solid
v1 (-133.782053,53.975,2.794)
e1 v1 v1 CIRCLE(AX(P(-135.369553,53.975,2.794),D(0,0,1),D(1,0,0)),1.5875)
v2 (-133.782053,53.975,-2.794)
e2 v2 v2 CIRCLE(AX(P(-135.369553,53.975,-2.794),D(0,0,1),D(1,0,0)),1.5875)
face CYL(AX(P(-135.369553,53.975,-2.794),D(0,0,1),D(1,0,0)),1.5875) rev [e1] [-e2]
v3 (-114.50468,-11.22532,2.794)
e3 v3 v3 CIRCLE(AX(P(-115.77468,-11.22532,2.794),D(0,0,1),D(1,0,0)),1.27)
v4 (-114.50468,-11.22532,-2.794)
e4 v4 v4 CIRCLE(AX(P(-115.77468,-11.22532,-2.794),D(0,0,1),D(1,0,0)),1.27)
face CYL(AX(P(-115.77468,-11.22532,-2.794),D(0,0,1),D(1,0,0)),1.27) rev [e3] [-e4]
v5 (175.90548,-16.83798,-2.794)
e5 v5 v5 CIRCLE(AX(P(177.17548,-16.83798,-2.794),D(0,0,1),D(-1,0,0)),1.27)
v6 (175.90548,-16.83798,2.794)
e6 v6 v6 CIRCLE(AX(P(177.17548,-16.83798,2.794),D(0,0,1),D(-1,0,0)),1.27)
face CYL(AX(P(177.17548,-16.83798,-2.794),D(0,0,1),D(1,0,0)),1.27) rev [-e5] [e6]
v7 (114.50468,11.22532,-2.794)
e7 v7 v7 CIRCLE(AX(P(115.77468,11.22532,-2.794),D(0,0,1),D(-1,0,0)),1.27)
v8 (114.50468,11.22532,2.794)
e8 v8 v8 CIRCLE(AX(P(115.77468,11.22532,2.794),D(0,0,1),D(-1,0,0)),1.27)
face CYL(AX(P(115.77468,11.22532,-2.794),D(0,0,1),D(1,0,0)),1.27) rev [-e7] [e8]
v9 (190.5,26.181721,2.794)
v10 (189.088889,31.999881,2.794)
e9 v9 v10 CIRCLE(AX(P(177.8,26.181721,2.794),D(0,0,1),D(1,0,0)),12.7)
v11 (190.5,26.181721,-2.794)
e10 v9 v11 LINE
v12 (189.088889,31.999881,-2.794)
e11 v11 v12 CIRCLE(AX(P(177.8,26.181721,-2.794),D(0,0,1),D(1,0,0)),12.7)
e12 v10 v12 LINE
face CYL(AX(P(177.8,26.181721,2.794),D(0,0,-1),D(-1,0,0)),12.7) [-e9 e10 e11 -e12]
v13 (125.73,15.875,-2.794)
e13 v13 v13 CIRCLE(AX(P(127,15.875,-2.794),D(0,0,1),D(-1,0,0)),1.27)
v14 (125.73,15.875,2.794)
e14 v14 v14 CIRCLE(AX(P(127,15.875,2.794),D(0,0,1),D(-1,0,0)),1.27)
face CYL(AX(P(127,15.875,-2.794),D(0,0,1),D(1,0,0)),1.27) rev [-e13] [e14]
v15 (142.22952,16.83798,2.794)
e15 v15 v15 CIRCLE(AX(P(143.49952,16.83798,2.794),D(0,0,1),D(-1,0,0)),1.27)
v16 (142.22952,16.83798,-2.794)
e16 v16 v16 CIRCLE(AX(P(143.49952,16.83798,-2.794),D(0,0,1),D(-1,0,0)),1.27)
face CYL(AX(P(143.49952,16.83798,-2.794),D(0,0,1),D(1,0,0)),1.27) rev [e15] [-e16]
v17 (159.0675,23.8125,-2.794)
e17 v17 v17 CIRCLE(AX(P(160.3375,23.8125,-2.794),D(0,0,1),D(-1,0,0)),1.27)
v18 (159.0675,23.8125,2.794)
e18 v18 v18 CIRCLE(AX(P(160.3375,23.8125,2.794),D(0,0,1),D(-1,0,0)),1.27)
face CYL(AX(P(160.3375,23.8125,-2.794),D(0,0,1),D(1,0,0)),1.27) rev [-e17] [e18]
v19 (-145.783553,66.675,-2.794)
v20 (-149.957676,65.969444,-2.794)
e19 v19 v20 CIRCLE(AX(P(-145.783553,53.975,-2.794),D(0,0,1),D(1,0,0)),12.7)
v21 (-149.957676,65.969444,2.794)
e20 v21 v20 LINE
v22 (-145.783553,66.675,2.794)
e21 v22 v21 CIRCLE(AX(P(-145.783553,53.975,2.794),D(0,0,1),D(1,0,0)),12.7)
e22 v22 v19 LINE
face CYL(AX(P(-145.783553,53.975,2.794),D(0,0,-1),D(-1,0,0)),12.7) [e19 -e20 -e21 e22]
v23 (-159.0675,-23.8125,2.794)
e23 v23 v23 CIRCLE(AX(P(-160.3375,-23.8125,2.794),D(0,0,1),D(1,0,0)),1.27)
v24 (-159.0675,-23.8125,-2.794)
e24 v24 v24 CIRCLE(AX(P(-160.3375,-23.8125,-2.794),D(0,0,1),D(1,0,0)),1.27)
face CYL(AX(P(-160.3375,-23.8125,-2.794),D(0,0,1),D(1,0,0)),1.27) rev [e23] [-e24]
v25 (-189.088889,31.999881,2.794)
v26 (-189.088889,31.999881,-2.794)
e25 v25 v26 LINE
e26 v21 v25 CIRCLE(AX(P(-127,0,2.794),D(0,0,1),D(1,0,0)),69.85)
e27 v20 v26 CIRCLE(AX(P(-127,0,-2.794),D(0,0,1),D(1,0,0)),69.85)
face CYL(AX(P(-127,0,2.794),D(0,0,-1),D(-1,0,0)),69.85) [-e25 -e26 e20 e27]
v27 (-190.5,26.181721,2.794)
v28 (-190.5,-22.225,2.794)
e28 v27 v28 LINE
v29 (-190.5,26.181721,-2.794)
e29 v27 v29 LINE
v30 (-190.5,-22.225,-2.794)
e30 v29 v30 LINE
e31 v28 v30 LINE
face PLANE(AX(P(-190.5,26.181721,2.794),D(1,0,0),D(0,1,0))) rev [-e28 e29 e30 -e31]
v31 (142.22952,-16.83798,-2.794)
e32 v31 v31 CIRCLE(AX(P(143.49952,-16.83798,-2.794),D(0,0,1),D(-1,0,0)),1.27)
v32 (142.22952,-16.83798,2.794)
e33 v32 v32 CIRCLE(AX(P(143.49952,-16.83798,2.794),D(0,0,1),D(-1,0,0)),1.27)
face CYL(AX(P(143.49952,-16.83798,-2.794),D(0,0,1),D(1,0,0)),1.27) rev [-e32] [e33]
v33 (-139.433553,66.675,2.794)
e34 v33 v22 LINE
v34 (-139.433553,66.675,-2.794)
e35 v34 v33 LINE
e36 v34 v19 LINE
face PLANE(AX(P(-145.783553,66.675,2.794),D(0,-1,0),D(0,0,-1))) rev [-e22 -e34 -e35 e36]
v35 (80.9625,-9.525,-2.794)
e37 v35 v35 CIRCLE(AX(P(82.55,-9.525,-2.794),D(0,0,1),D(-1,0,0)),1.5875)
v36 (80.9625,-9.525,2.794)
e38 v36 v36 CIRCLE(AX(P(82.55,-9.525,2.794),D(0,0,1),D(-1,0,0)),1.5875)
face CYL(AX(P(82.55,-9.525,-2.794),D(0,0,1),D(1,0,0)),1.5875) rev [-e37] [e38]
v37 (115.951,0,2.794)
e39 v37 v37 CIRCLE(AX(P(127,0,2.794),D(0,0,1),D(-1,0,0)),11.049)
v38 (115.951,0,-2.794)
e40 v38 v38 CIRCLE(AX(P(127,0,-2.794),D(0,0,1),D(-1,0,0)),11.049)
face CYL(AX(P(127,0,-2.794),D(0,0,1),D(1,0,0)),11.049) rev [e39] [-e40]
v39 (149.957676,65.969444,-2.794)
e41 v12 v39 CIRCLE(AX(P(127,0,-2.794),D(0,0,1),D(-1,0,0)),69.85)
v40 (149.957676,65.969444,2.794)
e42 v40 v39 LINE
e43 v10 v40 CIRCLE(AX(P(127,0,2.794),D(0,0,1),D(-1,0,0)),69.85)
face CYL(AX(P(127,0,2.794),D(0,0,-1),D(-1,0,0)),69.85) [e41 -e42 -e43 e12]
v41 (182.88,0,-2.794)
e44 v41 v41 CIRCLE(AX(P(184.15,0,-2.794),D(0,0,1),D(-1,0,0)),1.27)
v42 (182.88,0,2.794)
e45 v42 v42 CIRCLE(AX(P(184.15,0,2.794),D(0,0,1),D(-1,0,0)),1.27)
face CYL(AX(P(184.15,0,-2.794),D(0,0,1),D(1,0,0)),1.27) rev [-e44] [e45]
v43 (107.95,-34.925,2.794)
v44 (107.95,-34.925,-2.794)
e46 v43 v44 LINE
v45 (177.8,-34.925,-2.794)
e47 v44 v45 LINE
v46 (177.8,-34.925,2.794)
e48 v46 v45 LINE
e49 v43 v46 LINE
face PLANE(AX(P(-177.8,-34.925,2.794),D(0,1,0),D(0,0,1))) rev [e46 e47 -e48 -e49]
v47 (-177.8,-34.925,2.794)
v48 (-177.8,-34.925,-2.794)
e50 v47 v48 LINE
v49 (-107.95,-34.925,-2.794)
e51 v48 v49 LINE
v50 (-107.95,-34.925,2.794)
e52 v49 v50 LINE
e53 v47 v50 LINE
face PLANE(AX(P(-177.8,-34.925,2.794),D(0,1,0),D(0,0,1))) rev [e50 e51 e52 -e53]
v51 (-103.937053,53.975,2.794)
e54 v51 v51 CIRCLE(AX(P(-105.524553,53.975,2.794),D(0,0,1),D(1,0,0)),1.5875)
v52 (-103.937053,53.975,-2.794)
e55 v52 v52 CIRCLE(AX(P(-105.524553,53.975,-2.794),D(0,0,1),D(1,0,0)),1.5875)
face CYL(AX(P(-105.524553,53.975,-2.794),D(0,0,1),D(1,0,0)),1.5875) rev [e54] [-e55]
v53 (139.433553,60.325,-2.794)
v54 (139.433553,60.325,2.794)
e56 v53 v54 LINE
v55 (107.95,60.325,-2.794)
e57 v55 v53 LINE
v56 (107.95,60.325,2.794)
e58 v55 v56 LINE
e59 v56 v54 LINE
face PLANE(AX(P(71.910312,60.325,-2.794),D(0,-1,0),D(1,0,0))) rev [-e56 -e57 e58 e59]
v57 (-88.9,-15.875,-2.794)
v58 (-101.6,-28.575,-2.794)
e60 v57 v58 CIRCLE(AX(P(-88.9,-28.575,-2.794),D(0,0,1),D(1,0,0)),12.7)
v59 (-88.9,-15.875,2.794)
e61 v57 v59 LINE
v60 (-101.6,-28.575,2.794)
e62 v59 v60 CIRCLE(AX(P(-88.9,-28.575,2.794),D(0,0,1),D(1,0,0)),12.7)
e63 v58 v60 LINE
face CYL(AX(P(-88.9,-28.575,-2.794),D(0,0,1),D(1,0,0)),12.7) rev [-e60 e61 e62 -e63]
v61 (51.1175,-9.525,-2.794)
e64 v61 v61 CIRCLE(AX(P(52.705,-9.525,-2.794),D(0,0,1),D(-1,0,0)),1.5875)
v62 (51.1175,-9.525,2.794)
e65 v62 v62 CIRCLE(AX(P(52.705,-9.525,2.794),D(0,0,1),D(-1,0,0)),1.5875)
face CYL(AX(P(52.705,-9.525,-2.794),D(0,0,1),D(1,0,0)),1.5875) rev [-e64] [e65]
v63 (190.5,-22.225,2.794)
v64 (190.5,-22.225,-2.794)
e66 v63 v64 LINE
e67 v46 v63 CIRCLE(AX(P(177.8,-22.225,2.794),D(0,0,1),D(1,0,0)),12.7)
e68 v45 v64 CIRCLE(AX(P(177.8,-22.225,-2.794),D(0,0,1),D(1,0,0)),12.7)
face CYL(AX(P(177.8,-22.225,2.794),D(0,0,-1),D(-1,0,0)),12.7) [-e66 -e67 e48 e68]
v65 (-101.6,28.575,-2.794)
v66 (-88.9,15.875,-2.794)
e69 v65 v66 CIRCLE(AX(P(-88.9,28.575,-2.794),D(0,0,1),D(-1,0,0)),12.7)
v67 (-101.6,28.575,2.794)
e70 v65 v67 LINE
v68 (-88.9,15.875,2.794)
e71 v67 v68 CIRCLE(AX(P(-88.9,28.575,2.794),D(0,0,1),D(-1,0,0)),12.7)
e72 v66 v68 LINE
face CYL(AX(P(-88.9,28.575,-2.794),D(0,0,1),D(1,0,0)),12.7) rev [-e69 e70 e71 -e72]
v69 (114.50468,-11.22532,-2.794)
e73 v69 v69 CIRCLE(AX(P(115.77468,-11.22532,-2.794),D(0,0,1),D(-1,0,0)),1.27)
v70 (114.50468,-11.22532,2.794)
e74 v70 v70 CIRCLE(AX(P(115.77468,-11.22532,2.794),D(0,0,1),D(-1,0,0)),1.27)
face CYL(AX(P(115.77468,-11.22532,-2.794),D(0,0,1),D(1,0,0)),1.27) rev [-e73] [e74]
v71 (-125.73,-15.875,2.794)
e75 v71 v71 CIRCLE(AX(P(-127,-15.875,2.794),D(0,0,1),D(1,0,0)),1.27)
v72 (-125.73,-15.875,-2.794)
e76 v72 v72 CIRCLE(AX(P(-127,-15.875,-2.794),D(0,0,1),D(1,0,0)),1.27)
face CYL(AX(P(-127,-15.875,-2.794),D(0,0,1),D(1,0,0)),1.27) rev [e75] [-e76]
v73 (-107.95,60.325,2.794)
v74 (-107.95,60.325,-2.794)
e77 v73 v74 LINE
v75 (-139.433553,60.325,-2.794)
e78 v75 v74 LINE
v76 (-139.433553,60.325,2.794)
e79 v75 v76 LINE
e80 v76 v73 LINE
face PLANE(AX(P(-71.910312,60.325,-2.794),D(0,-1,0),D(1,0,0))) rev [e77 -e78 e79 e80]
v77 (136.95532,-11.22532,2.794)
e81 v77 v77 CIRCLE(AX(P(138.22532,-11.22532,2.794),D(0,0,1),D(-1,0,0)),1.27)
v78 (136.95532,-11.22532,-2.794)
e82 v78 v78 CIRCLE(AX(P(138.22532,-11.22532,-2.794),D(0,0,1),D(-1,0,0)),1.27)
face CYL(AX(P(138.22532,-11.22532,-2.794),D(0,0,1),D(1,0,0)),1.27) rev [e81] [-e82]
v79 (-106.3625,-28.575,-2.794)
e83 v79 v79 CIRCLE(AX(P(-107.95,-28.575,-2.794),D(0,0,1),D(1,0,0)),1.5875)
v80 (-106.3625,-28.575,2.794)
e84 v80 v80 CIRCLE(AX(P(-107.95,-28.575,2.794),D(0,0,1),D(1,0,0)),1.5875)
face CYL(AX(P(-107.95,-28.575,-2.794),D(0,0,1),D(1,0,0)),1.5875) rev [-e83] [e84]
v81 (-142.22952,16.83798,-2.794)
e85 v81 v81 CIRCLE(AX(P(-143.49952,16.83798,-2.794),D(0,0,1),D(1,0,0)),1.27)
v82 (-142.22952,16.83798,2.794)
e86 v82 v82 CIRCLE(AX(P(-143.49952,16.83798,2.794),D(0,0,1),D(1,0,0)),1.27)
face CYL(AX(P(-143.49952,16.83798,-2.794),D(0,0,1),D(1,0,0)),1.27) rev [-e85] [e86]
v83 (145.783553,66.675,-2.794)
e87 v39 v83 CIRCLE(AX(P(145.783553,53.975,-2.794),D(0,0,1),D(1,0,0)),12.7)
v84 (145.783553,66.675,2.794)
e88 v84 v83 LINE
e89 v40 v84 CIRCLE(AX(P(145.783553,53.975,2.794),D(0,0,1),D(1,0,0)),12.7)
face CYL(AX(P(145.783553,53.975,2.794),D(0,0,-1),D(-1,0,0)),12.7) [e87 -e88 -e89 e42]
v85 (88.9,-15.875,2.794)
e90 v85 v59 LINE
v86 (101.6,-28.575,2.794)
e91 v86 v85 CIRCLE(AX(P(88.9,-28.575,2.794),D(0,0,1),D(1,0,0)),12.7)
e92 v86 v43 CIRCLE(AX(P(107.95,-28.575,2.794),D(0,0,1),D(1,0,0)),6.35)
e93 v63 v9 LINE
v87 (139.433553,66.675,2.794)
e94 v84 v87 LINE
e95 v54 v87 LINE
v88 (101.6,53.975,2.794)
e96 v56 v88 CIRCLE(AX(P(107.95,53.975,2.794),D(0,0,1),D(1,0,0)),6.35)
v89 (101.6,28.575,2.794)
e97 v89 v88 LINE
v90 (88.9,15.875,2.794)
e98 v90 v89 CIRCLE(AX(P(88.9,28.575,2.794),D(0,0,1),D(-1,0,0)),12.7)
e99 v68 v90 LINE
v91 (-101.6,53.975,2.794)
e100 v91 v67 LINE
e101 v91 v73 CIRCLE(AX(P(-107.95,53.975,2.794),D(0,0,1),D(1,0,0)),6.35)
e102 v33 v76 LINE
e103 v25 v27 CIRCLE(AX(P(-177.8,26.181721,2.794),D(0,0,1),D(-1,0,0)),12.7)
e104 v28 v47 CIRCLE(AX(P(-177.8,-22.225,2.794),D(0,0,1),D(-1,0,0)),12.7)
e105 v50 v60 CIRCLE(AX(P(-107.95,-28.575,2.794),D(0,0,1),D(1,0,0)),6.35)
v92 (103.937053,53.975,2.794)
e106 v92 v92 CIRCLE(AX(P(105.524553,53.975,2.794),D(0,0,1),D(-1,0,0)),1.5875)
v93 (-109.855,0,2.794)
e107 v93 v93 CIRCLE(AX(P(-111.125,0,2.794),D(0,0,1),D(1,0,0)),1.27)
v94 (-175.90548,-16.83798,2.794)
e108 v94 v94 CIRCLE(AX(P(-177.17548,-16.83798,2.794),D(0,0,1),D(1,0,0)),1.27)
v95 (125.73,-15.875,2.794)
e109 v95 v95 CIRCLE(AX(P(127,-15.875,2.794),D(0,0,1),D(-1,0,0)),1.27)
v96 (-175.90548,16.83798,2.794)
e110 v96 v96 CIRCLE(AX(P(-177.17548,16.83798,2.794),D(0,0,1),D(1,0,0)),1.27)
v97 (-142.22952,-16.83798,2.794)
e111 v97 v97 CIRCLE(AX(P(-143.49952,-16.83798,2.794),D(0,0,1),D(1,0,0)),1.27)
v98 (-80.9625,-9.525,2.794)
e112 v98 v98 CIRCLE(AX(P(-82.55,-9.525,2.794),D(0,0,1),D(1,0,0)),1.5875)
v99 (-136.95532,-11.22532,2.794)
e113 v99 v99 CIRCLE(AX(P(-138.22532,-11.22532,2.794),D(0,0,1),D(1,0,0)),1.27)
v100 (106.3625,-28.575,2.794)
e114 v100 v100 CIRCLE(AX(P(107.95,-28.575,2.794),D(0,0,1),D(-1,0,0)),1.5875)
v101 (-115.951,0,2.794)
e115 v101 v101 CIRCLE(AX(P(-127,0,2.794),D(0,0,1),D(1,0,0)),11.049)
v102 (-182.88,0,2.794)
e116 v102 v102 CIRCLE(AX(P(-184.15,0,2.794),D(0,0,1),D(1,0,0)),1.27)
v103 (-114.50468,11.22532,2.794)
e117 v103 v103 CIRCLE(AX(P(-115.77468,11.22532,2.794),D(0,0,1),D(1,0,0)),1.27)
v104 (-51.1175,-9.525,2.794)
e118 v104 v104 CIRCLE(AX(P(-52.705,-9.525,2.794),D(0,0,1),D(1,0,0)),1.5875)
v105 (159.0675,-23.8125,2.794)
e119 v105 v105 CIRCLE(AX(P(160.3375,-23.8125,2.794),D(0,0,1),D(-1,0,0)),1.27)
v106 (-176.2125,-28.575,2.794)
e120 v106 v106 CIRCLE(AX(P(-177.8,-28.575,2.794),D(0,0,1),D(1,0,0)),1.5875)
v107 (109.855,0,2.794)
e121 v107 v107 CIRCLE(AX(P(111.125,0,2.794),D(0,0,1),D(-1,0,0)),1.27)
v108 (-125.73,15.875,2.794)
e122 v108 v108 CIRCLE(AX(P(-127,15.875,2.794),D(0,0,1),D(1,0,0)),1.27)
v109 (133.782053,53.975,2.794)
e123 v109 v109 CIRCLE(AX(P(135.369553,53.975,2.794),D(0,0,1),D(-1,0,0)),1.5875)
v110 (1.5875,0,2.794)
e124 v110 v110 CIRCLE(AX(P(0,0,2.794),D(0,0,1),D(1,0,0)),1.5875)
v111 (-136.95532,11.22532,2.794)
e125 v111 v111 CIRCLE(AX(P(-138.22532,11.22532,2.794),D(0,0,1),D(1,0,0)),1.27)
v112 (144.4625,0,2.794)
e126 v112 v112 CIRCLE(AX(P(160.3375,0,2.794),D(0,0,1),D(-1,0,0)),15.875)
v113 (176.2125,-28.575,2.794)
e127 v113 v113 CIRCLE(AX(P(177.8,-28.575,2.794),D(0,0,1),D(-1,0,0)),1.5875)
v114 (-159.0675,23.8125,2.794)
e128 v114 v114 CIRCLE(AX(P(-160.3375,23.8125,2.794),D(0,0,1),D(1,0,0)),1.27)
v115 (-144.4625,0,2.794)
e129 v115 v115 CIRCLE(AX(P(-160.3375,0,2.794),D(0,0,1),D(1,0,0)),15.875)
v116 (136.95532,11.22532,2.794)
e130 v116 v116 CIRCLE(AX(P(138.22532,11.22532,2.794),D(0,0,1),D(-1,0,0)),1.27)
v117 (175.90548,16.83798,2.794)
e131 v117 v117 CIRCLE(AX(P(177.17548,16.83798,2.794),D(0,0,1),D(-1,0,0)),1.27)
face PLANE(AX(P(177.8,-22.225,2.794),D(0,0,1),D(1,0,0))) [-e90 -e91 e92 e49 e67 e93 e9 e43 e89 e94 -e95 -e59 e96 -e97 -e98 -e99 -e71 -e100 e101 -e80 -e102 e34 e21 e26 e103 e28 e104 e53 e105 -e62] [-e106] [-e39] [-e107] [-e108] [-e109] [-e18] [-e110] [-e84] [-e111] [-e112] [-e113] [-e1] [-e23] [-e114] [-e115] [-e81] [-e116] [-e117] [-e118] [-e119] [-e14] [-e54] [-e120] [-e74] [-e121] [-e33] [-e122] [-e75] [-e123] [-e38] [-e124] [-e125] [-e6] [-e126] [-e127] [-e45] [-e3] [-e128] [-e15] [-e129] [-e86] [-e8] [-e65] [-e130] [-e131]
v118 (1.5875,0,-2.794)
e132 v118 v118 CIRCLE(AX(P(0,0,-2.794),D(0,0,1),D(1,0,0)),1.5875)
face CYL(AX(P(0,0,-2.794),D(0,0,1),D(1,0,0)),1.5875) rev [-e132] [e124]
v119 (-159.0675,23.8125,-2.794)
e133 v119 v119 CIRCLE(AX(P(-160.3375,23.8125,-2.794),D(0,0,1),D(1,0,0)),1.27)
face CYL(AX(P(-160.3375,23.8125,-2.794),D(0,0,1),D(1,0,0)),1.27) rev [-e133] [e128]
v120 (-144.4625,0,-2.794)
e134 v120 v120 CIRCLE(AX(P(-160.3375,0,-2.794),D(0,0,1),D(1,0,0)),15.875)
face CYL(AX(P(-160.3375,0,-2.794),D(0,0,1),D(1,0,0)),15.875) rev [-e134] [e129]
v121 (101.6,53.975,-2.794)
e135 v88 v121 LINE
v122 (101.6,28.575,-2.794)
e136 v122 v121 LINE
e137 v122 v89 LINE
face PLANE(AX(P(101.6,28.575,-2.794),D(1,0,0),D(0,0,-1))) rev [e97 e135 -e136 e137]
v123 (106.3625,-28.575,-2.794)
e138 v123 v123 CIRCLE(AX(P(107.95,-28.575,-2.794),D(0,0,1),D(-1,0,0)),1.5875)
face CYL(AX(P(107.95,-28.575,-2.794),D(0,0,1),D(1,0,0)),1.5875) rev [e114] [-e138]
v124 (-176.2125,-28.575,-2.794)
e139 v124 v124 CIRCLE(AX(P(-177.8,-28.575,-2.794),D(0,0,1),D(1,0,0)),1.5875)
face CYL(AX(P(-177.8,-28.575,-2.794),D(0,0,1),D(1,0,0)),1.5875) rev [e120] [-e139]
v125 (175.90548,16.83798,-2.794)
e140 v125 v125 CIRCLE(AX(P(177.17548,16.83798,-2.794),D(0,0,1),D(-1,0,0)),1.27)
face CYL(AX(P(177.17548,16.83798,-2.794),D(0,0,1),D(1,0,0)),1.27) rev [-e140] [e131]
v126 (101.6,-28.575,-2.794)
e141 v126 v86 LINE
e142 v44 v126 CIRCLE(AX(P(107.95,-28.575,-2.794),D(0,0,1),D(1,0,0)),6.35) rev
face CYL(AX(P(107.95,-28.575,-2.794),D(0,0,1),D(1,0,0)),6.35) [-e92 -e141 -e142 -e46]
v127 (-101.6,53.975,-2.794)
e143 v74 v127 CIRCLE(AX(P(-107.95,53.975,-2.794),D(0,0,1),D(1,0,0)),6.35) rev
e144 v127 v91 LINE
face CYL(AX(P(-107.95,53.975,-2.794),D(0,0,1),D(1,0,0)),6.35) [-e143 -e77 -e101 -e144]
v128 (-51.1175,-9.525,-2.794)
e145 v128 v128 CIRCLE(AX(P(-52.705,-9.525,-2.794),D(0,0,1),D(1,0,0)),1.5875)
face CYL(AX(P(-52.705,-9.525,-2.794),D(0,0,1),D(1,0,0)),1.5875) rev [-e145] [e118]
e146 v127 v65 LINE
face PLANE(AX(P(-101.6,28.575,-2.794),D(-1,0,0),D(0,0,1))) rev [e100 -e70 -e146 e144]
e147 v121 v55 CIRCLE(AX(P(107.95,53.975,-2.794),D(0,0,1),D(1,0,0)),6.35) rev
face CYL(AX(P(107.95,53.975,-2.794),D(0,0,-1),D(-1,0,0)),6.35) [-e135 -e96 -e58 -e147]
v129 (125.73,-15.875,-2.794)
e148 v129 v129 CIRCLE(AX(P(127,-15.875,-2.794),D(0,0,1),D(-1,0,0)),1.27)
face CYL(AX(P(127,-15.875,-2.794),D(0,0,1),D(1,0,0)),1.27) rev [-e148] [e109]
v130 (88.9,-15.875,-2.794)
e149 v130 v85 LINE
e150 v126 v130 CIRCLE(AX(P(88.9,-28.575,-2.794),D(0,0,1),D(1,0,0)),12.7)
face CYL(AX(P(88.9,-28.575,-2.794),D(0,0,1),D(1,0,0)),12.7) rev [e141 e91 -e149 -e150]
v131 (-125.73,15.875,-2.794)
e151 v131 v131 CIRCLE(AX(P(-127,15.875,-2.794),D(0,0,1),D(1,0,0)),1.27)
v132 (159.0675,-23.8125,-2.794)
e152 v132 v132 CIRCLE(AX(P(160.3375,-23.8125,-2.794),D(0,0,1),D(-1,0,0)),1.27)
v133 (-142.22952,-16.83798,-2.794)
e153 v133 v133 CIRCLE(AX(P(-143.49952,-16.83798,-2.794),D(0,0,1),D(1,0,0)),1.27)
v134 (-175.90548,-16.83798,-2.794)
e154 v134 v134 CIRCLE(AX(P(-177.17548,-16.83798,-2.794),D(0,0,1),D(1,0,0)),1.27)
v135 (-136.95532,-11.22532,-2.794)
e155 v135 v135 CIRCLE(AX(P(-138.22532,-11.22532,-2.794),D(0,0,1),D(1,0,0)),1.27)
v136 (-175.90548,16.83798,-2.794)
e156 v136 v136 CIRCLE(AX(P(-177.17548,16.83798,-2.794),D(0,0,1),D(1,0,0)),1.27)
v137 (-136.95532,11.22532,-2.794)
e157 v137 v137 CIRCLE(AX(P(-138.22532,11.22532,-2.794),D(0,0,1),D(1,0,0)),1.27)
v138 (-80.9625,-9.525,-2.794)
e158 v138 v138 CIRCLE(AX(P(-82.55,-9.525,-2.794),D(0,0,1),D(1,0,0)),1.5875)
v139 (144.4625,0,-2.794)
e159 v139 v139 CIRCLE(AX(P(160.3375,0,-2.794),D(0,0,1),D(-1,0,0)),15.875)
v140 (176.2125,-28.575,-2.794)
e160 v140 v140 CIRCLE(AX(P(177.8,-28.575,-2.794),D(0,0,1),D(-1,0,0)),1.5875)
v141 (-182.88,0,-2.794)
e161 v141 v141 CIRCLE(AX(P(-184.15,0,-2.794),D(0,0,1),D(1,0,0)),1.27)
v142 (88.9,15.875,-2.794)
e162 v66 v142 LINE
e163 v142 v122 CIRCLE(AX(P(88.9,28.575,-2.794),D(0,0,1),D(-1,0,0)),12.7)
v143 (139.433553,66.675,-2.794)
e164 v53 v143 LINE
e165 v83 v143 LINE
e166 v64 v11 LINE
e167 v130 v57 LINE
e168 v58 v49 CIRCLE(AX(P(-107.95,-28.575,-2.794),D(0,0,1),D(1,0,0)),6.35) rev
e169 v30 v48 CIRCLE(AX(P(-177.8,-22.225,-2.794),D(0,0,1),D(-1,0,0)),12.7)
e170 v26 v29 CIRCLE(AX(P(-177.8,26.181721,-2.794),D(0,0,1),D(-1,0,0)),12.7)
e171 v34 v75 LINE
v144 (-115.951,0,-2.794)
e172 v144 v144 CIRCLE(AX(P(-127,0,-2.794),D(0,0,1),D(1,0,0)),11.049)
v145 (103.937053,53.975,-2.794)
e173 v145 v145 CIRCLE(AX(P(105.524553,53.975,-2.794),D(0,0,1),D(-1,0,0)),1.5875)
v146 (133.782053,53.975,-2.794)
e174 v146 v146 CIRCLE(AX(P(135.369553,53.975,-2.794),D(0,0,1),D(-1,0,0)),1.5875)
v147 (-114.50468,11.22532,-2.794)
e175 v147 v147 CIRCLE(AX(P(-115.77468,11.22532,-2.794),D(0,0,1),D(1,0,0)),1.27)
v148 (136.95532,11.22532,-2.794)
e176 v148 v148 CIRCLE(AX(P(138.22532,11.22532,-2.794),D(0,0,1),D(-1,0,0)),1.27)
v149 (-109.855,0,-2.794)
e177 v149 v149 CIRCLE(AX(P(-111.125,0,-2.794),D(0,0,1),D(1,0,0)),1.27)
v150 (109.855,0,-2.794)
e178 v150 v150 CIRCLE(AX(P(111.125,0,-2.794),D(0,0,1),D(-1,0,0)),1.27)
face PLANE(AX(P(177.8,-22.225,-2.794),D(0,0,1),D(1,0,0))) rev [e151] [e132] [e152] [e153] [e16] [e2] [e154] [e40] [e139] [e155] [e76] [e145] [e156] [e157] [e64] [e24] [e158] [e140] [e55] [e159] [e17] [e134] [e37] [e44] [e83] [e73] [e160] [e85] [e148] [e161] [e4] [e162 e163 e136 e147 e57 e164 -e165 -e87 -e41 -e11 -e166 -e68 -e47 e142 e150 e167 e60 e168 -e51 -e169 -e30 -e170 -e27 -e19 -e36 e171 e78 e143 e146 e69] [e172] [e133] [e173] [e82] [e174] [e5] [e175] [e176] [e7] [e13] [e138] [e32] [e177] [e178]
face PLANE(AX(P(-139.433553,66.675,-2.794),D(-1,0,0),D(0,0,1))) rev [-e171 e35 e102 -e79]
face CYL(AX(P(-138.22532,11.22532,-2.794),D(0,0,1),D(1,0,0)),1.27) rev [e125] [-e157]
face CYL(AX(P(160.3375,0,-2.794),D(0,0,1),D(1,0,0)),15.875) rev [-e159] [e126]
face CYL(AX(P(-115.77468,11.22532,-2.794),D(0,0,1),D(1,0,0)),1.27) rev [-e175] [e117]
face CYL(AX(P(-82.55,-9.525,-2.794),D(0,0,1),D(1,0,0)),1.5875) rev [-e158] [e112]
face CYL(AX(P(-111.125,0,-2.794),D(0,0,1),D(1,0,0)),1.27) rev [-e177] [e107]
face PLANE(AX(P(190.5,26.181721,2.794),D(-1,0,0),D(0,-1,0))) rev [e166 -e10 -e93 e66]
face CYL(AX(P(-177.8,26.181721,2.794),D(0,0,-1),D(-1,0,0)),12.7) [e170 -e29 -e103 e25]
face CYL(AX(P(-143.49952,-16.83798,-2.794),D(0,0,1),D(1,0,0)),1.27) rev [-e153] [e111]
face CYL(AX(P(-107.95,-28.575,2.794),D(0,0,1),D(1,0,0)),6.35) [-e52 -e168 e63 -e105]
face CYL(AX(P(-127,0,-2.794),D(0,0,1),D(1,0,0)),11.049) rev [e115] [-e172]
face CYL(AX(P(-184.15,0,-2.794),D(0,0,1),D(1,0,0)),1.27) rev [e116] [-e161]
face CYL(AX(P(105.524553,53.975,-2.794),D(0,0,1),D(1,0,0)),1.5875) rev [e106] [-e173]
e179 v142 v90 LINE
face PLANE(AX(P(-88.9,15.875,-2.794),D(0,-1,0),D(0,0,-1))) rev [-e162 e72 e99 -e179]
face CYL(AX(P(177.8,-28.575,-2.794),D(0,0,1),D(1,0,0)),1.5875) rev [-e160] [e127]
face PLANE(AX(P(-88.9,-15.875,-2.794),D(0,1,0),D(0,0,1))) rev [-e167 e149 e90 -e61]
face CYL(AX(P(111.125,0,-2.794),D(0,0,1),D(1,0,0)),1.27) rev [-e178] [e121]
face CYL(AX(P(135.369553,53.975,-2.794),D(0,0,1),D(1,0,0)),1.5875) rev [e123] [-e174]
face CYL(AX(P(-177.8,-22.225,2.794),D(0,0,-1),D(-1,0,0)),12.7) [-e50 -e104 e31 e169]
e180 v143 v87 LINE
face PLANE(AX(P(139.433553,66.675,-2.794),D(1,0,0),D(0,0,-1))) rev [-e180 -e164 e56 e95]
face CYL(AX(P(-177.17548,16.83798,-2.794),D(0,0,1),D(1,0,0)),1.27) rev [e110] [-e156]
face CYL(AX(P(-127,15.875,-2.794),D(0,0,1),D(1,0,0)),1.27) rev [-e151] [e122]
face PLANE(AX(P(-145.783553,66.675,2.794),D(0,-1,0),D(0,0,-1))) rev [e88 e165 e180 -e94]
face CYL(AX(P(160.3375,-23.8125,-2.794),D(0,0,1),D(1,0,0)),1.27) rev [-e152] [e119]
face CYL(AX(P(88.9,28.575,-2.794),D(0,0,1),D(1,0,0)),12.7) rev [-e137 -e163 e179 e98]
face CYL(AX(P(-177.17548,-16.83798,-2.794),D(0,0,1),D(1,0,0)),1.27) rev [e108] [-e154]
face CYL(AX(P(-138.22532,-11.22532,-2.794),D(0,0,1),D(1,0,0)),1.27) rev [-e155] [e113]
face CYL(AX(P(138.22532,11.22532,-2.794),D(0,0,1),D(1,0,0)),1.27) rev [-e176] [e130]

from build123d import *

# Parameters (mm, degrees)
SKETCH1_R           = 3.175
BOSS_EXTRUDE1_DEPTH = 2.794
SKETCH2_R           = 11.049
SKETCH2_R_2         = 15.875
SKETCH2_R_3         = 1.27
CUT_EXTRUDE1_DEPTH  = 202.908472752
ITC_CUTOUT_DEPTH    = 202.908472752
SKETCH6_W           = 67.523241089
SKETCH6_H           = 6.35
CUT_EXTRUDE3_DEPTH  = 202.908472752
FILLET1_R           = 6.35
CUT_EXTRUDE4_DEPTH  = 202.908472752
FILLET2_R           = 6.35
SKETCH8_R           = 1.5875
CUT_EXTRUDE5_DEPTH  = 202.908472752
SKETCH10_R          = 1.5875
CUT_EXTRUDE6_DEPTH  = 202.908472752
SKETCH11_R          = 1.5875
CUT_EXTRUDE7_DEPTH  = 202.908472752


with BuildPart() as part:
    # Sketch1 → Boss-Extrude1 (new, symmetric)
    with BuildSketch(Plane.XY):
        with BuildLine():
            Line((-145.783553311, 66.675), (145.783553311, 66.675))
            ThreePointArc((145.783553311, 66.675), (147.900219978, 66.497368874), (149.957676269, 65.969444444))
            ThreePointArc((149.957676269, 65.969444444), (172.789871953, 52.74760778), (189.088888889, 31.999880883))
            ThreePointArc((189.088888889, 31.999880883), (190.142181511, 29.17513943), (190.5, 26.181720723))
            Line((190.5, 26.181720723), (190.5, -22.225))
            ThreePointArc((190.5, -22.225), (186.780256121, -31.205256121), (177.8, -34.925))
            Line((177.8, -34.925), (-177.8, -34.925))
            ThreePointArc((-177.8, -34.925), (-186.780256121, -31.205256121), (-190.5, -22.225))
            Line((-190.5, -22.225), (-190.5, 26.181720723))
            ThreePointArc((-190.5, 26.181720723), (-190.142181511, 29.17513943), (-189.088888889, 31.999880883))
            ThreePointArc((-189.088888889, 31.999880883), (-172.789871953, 52.74760778), (-149.957676269, 65.969444444))
            ThreePointArc((-149.957676269, 65.969444444), (-147.900219978, 66.497368874), (-145.783553311, 66.675))
        make_face()
        with Locations((-127, 0)):
            Circle(SKETCH1_R, mode=Mode.SUBTRACT)
        with Locations((127, 0)):
            Circle(SKETCH1_R, mode=Mode.SUBTRACT)
    extrude(amount=BOSS_EXTRUDE1_DEPTH, both=True)

    # Sketch2 → Cut-Extrude1 (cut, through all)
    with BuildSketch(Plane.XY.offset(2.794)):
        with Locations((-127, 0)):
            Circle(SKETCH2_R)
        with Locations((-160.3375, 0)):
            Circle(SKETCH2_R_2)
        with Locations((-143.499519773, 16.837980227)):
            Circle(SKETCH2_R_3)
        with Locations((-160.3375, 23.8125)):
            Circle(SKETCH2_R_3)
        with Locations((-143.499519773, -16.837980227)):
            Circle(SKETCH2_R_3)
        with Locations((-160.3375, -23.8125)):
            Circle(SKETCH2_R_3)
        with Locations((-177.175480227, -16.837980227)):
            Circle(SKETCH2_R_3)
        with Locations((-184.15, 0)):
            Circle(SKETCH2_R_3)
        with Locations((-177.175480227, 16.837980227)):
            Circle(SKETCH2_R_3)
        with Locations((-127, 15.875)):
            Circle(SKETCH2_R_3)
        with Locations((-115.774679849, 11.225320151)):
            Circle(SKETCH2_R_3)
        with Locations((-111.125, 0)):
            Circle(SKETCH2_R_3)
        with Locations((-115.774679849, -11.225320151)):
            Circle(SKETCH2_R_3)
        with Locations((-127, -15.875)):
            Circle(SKETCH2_R_3)
        with Locations((-138.225320151, -11.225320151)):
            Circle(SKETCH2_R_3)
        with Locations(Location((138.225320151, 11.225320151, 0), (0, 0, 180))):
            Circle(SKETCH2_R_3)
        with Locations((-138.225320151, 11.225320151)):
            Circle(SKETCH2_R_3)
        with Locations(Location((138.225320151, -11.225320151, 0), (0, 0, 180))):
            Circle(SKETCH2_R_3)
        with Locations(Location((127, -15.875, 0), (0, 0, 180))):
            Circle(SKETCH2_R_3)
        with Locations(Location((115.774679849, -11.225320151, 0), (0, 0, 180))):
            Circle(SKETCH2_R_3)
        with Locations(Location((111.125, 0, 0), (0, 0, 180))):
            Circle(SKETCH2_R_3)
        with Locations(Location((115.774679849, 11.225320151, 0), (0, 0, 180))):
            Circle(SKETCH2_R_3)
        with Locations(Location((127, 15.875, 0), (0, 0, 180))):
            Circle(SKETCH2_R_3)
        with Locations(Location((177.175480227, 16.837980227, 0), (0, 0, 180))):
            Circle(SKETCH2_R_3)
        with Locations(Location((184.15, 0, 0), (0, 0, 180))):
            Circle(SKETCH2_R_3)
        with Locations(Location((177.175480227, -16.837980227, 0), (0, 0, 180))):
            Circle(SKETCH2_R_3)
        with Locations(Location((160.3375, -23.8125, 0), (0, 0, 180))):
            Circle(SKETCH2_R_3)
        with Locations(Location((143.499519773, -16.837980227, 0), (0, 0, 180))):
            Circle(SKETCH2_R_3)
        with Locations(Location((160.3375, 23.8125, 0), (0, 0, 180))):
            Circle(SKETCH2_R_3)
        with Locations(Location((143.499519773, 16.837980227, 0), (0, 0, 180))):
            Circle(SKETCH2_R_3)
        with Locations(Location((160.3375, 0, 0), (0, 0, 180))):
            Circle(SKETCH2_R_2)
        with Locations(Location((127, 0, 0), (0, 0, 180))):
            Circle(SKETCH2_R)
    extrude(amount=-CUT_EXTRUDE1_DEPTH, mode=Mode.SUBTRACT)

    # Sketch5 → ITC_Cutout (cut, through all)
    with BuildSketch(Plane.XY.offset(2.794)):
        with BuildLine():
            Line((-88.9, 15.875), (88.9, 15.875))
            ThreePointArc((88.9, 15.875), (97.880256121, 19.594743879), (101.6, 28.575))
            Line((101.6, 28.575), (101.6, 66.675))
            Line((101.6, 66.675), (-101.6, 66.675))
            Line((-101.6, 66.675), (-101.6, 28.575))
            ThreePointArc((-101.6, 28.575), (-97.880256121, 19.594743879), (-88.9, 15.875))
        make_face()
    extrude(amount=-ITC_CUTOUT_DEPTH, mode=Mode.SUBTRACT)

    # Sketch6 → Cut-Extrude3 (cut, through all)
    with BuildSketch(Plane.XY.offset(2.794)):
        with Locations((-105.671932766, 63.5)):
            Rectangle(SKETCH6_W, SKETCH6_H)
        with Locations((105.671932766, 63.5)):
            Rectangle(SKETCH6_W, SKETCH6_H)
    extrude(amount=-CUT_EXTRUDE3_DEPTH, mode=Mode.SUBTRACT)

    # Fillet1
    fillet1_edges = [part.edges().sort_by_distance(p)[0] for p in [
        (-101.6, 60.325, 0),
        (101.6, 60.325, 0),
    ]]
    fillet(fillet1_edges, radius=FILLET1_R)

    # Sketch7 → Cut-Extrude4 (cut, through all)
    with BuildSketch(Plane.XY.offset(2.794)):
        with BuildLine():
            Line((-88.9, -15.875), (88.9, -15.875))
            ThreePointArc((88.9, -15.875), (97.880256121, -19.594743879), (101.6, -28.575))
            Line((101.6, -28.575), (101.6, -34.925))
            Line((101.6, -34.925), (-101.6, -34.925))
            Line((-101.6, -34.925), (-101.6, -28.575))
            ThreePointArc((-101.6, -28.575), (-97.880256121, -19.594743879), (-88.9, -15.875))
        make_face()
    extrude(amount=-CUT_EXTRUDE4_DEPTH, mode=Mode.SUBTRACT)

    # Fillet2
    fillet2_edges = [part.edges().sort_by_distance(p)[0] for p in [
        (101.6, -34.925, 0),
        (-101.6, -34.925, 0),
    ]]
    fillet(fillet2_edges, radius=FILLET2_R - 0.0001)  # a hair under: the kernel refuses the full size

    # Sketch8 → Cut-Extrude5 (cut, through all)
    with BuildSketch(Plane.XY.offset(2.794)):
        with Locations((-135.369553311, 53.975)):
            Circle(SKETCH8_R)
        with Locations((-105.524553311, 53.975)):
            Circle(SKETCH8_R)
        with Locations(Location((105.524553311, 53.975, 0), (0, 0, 180))):
            Circle(SKETCH8_R)
        with Locations(Location((135.369553311, 53.975, 0), (0, 0, 180))):
            Circle(SKETCH8_R)
    extrude(amount=-CUT_EXTRUDE5_DEPTH, mode=Mode.SUBTRACT)

    # Sketch10 → Cut-Extrude6 (cut, through all)
    with BuildSketch(Plane.XY.offset(2.794)):
        with Locations((-177.8, -28.575)):
            Circle(SKETCH10_R)
        with Locations((-107.95, -28.575)):
            Circle(SKETCH10_R)
        with Locations(Location((107.95, -28.575, 0), (0, 0, 180))):
            Circle(SKETCH10_R)
        with Locations(Location((177.8, -28.575, 0), (0, 0, 180))):
            Circle(SKETCH10_R)
        Circle(SKETCH10_R)
    extrude(amount=-CUT_EXTRUDE6_DEPTH, mode=Mode.SUBTRACT)

    # Sketch11 → Cut-Extrude7 (cut, through all)
    with BuildSketch(Plane.XY.offset(2.794)):
        with Locations((-82.55, -9.525)):
            Circle(SKETCH11_R)
        with Locations((-52.705, -9.525)):
            Circle(SKETCH11_R)
        with Locations(Location((52.705, -9.525, 0), (0, 0, 180))):
            Circle(SKETCH11_R)
        with Locations(Location((82.55, -9.525, 0), (0, 0, 180))):
            Circle(SKETCH11_R)
    extrude(amount=-CUT_EXTRUDE7_DEPTH, mode=Mode.SUBTRACT)


solid = part.part
